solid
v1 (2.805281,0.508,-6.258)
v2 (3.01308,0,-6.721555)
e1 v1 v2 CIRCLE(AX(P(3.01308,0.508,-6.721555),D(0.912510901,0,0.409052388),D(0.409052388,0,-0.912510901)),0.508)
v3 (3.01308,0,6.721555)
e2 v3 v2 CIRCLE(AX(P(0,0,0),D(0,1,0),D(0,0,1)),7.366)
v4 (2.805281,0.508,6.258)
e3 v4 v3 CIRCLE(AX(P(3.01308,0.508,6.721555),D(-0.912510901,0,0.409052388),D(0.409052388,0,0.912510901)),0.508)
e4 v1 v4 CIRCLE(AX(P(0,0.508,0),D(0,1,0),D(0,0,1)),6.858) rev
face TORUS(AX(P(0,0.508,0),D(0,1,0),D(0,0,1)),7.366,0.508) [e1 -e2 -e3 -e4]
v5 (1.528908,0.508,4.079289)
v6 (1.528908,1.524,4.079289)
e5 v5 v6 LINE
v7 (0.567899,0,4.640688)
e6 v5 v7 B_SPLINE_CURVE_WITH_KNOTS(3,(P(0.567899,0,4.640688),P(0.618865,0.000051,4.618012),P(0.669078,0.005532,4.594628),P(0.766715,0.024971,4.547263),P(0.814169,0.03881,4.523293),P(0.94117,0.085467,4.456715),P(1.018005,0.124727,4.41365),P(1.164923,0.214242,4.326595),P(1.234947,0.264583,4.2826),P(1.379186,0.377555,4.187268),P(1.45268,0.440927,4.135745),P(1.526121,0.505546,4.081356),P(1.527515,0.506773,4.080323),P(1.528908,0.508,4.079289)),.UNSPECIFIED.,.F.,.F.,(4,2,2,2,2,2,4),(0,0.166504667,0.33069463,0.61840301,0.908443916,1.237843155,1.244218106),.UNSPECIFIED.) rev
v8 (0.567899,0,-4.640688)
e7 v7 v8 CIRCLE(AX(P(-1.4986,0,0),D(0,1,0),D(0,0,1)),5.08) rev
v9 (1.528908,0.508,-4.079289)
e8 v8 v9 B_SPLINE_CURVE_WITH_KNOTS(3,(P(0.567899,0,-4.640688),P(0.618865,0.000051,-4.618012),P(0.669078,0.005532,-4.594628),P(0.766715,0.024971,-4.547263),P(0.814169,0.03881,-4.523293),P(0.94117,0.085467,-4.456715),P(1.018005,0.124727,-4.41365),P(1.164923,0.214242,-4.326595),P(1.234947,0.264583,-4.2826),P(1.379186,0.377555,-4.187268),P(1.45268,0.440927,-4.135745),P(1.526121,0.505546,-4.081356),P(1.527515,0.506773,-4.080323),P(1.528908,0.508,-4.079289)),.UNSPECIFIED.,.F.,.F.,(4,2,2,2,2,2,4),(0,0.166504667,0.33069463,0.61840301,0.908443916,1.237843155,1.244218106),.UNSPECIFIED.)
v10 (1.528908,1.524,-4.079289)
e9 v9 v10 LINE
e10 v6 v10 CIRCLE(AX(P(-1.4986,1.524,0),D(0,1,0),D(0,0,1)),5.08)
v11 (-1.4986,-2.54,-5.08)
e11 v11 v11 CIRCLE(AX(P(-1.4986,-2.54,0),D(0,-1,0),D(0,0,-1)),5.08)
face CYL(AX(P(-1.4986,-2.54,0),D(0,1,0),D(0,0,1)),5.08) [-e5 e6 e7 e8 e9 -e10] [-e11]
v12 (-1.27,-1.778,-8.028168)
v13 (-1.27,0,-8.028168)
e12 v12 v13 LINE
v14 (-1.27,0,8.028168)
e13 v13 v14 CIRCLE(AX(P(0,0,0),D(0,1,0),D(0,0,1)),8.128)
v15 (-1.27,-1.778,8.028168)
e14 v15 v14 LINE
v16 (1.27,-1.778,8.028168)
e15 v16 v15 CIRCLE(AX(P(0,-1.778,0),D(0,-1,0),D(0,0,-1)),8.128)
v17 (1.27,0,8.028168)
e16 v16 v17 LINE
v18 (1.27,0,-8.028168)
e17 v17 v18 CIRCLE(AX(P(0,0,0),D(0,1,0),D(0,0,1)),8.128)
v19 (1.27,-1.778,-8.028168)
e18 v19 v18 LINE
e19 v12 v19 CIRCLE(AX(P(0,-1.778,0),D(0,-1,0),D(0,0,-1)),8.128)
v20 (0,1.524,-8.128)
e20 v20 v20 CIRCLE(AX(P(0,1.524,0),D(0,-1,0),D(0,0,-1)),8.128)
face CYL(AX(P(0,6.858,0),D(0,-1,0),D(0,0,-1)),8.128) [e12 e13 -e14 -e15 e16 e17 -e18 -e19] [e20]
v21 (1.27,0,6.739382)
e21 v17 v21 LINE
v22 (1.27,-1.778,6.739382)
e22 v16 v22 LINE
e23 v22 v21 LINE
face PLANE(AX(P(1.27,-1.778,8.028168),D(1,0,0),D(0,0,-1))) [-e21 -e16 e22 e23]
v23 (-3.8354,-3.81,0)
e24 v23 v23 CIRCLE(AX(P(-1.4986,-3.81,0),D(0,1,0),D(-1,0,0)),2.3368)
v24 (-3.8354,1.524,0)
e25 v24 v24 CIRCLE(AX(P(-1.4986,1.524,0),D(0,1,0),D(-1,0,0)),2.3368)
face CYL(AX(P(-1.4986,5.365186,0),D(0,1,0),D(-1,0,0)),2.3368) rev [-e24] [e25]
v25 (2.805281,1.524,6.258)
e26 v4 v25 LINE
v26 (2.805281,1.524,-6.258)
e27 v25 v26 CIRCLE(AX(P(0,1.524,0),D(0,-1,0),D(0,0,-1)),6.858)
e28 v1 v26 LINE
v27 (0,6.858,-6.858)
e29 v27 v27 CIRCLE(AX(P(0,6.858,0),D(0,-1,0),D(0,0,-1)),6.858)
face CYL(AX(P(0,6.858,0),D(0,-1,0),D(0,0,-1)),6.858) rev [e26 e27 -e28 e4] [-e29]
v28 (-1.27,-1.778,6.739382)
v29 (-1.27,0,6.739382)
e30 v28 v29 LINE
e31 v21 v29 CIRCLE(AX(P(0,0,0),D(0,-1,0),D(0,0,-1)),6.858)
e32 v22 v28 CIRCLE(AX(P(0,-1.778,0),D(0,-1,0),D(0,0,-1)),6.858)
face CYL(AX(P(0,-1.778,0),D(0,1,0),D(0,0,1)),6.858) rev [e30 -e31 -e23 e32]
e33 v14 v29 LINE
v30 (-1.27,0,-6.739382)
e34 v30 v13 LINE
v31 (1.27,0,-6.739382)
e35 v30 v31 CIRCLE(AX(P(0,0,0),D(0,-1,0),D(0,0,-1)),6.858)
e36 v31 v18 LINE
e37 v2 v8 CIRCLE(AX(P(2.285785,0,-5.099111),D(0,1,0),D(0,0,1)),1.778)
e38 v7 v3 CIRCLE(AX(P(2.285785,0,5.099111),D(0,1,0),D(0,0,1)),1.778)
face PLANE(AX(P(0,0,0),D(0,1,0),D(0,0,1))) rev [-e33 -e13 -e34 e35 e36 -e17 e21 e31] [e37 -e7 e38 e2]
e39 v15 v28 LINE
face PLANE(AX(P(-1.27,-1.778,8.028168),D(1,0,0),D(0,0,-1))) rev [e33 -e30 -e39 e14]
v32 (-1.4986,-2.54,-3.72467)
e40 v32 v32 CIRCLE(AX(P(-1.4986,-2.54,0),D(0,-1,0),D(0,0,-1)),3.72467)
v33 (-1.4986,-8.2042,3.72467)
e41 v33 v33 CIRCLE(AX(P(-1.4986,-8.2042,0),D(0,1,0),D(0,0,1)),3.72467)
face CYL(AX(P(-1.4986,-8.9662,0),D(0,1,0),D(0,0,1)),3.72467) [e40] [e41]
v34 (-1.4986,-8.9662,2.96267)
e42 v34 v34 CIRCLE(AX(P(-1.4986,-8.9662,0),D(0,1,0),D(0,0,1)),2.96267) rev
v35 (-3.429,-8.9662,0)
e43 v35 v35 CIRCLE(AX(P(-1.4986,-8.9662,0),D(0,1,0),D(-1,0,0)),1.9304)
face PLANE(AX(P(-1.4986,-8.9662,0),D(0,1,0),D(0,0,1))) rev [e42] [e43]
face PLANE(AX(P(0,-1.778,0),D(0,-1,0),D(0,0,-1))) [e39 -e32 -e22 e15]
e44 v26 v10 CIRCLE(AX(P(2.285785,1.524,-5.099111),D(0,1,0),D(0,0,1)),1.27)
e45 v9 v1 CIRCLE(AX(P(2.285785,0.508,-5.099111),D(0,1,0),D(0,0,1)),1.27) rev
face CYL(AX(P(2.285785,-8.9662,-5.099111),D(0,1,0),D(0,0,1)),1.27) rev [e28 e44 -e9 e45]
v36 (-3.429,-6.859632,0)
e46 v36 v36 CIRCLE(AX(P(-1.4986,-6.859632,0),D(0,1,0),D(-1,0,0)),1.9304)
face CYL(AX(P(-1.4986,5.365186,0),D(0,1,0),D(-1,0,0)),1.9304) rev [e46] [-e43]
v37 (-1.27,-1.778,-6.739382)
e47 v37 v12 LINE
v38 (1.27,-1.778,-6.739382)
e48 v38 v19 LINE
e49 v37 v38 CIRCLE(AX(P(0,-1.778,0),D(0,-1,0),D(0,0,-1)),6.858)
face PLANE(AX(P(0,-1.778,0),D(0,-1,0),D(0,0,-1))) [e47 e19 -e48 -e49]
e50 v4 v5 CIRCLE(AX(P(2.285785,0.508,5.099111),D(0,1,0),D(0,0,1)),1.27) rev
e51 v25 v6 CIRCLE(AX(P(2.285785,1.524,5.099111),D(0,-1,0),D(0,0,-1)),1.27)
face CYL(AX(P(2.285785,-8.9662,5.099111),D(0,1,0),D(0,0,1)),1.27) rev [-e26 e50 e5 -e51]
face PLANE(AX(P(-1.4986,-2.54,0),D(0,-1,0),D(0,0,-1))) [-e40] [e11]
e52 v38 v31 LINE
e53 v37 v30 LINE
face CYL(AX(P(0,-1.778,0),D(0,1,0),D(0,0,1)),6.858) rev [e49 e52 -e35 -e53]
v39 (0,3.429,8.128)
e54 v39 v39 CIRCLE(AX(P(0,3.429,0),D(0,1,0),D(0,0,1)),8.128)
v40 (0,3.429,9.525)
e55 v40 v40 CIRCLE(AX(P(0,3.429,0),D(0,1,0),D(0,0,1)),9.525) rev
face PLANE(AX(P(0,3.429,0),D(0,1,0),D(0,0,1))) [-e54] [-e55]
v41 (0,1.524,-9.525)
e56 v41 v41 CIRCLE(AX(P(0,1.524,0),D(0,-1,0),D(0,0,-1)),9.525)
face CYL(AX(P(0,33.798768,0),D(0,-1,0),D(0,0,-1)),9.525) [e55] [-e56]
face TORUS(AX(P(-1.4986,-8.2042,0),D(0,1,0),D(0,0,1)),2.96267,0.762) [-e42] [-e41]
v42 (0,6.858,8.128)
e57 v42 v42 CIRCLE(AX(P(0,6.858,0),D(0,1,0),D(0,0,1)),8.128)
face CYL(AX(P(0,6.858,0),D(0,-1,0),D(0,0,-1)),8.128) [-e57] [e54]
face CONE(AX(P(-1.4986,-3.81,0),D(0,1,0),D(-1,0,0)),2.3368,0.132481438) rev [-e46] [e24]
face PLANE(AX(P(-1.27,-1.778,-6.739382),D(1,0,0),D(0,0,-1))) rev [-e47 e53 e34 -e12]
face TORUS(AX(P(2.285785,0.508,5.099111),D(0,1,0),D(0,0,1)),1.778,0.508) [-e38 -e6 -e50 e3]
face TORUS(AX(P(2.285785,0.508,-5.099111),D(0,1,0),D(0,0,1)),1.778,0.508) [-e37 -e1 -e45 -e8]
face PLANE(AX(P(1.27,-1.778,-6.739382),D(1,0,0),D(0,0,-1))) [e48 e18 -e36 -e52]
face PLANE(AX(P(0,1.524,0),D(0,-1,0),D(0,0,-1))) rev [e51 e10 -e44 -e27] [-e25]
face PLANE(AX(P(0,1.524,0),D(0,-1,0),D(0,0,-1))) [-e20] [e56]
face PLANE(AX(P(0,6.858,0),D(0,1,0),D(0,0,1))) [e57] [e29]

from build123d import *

# Parameters (mm, degrees)
SKETCH1_R              = 8.128
TOP_BODY_DEPTH         = 6.858
SKETCH2_R              = 5.08
ECCENTRIC_SLEEVE_DEPTH = 2.54
SKETCH3_R              = 3.724670389
ECCENTRIC_SHAFT_DEPTH  = 15.8242
SKETCH4_R              = 9.525
FLANGE_DEPTH           = 1.905
SKETCH5_R              = 6.858
TOP_HOLE_DEPTH         = 18.073240643
GROOVE_DEPTH           = 18.073240643
PINS_DEPTH             = 1.778
FILLET1_R              = 0.508
FILLET2_R              = 0.762


with BuildPart() as part:
    # Sketch1 → Top Body (new body)
    with BuildSketch(Plane(origin=(0, 0, 0), x_dir=(1, 0, 0), z_dir=(0, 1, 0))):
        with Locations(Location((0, 0, 0), (0, 0, 270))):
            Circle(SKETCH1_R)
    extrude(amount=TOP_BODY_DEPTH)

    # Sketch2 → Eccentric Sleeve (add)
    with BuildSketch(Plane.XZ):
        with Locations(Location((-1.4986, 0, 0), (0, 0, 90))):
            Circle(SKETCH2_R)
    extrude(amount=ECCENTRIC_SLEEVE_DEPTH)

    # Sketch3 → Eccentric Shaft (add)
    with BuildSketch(Plane(origin=(0, 6.858, 0), x_dir=(-1, 0, 0), z_dir=(0, 1, 0))):
        with Locations(Location((1.4986, 0, 0), (0, 0, 90))):
            Circle(SKETCH3_R)
    extrude(amount=-ECCENTRIC_SHAFT_DEPTH)

    # Sketch4 → Flange (add)
    with BuildSketch(Plane.XZ.offset(-1.524)):
        with Locations(Location((0, 0, 0), (0, 0, 270))):
            Circle(SKETCH4_R)
    extrude(amount=-FLANGE_DEPTH)

    # Sketch5 → Top Hole (cut, through all)
    with BuildSketch(Plane.XZ.offset(-1.524)):
        with Locations(Location((0, 0, 0), (0, 0, 270))):
            Circle(SKETCH5_R)
    extrude(amount=-TOP_HOLE_DEPTH, mode=Mode.SUBTRACT)

    # Sketch6 → Tapped Hole (revolve, cut)
    with BuildSketch(Plane.XY, mode=Mode.PRIVATE) as tapped_hole_sk:
        Polygon((0.8382, 1.524), (-1.4986, 1.524), (-1.4986, -8.9662), (0.4318, -8.9662), (0.4318, -6.859631692), (0.8382, -3.81), align=None)
    revolve(tapped_hole_sk.sketch.rotate(Axis((-1.4986, 5.365186462, 0), (0, -1, 0)), 180), axis=Axis((-1.4986, 5.365186462, 0), (0, -1, 0)), mode=Mode.SUBTRACT)

    # Sketch7 → Groove (cut, through all)
    with BuildSketch(Plane(origin=(0, 1.524, 0), x_dir=(-1, 0, 0), z_dir=(0, 1, 0))):
        with BuildLine():
            ThreePointArc((-2.805281279, 6.257999756), (-6.858, 0), (-2.805281279, -6.257999756))
            ThreePointArc((-2.805281279, -6.257999756), (-1.189982392, -5.741074463), (-1.528907797, -4.07928873))
            ThreePointArc((-1.528907797, -4.07928873), (-3.5814, 0), (-1.528907797, 4.07928873))
            ThreePointArc((-1.528907797, 4.07928873), (-1.189982392, 5.741074463), (-2.805281279, 6.257999756))
        make_face()
    extrude(amount=-GROOVE_DEPTH, mode=Mode.SUBTRACT)

    # Sketch8 → Pins (add)
    with BuildSketch(Plane.XZ):
        with BuildLine():
            Line((-1.27, 8.02816816), (-1.27, 6.739381574))
            ThreePointArc((-1.27, 6.739381574), (0, 6.858), (1.27, 6.739381574))
            Line((1.27, 6.739381574), (1.27, 8.02816816))
            ThreePointArc((1.27, 8.02816816), (0, 8.128), (-1.27, 8.02816816))
        make_face()
        with BuildLine():
            Line((1.27, -6.739381574), (1.27, -8.02816816))
            ThreePointArc((1.27, -8.02816816), (0, -8.128), (-1.27, -8.02816816))
            Line((-1.27, -8.02816816), (-1.27, -6.739381574))
            ThreePointArc((-1.27, -6.739381574), (0, -6.858), (1.27, -6.739381574))
        make_face()
    extrude(amount=PINS_DEPTH)

    # Fillet1
    # the kernel refuses this fillet: 0.508 mm, written as the material it takes off along each edge
    with BuildSketch(Plane(origin=(2.285784746, 0, -5.099110912), x_dir=(0.40905238828967766, 0, -0.9125109005565417), z_dir=(0.9125109005565417, 0, 0.40905238828967766))) as fillet1_piece_1_section:
        with BuildLine():
            CenterArc((1.27 + FILLET1_R, FILLET1_R), FILLET1_R, 180, 90)
            Line((1.27, FILLET1_R), (1.27, 0))
            Line((1.27, 0), (1.27 + FILLET1_R, 0))
        make_face()
    fillet1_piece_1 = revolve(axis=Axis((2.285784746, 0, -5.099110912), (0, 1, 0)), revolution_arc=224.939404777, mode=Mode.PRIVATE)
    fillet1_piece_1 = fillet1_piece_1 - Plane(origin=(-1.4986, 0.082765889, 0), x_dir=(0, 0, 1), z_dir=(0, 1, 0)) * Cylinder(5.08, 8, mode=Mode.PRIVATE)
    add(fillet1_piece_1, mode=Mode.SUBTRACT)
    with BuildSketch(Plane(origin=(0, 0, 0), x_dir=(0.40905238828967727, 0, 0.9125109005565418), z_dir=(-0.9125109005565418, 0, 0.40905238828967727))) as fillet1_piece_2:
        with BuildLine():
            CenterArc((6.858 + FILLET1_R, FILLET1_R), FILLET1_R, 180, 90)
            Line((6.858, FILLET1_R), (6.858, 0))
            Line((6.858, 0), (6.858 + FILLET1_R, 0))
        make_face()
    revolve(axis=Axis((0, 0, 0), (0, 1, 0)), revolution_arc=131.709357588, mode=Mode.SUBTRACT)
    with BuildSketch(Plane(origin=(2.285784746, 0, 5.099110912), x_dir=(0.355010429323337, 0, -0.9348623401718886), z_dir=(0.9348623401718886, 0, 0.355010429323337))) as fillet1_piece_3_section:
        with BuildLine():
            CenterArc((1.27 + FILLET1_R, FILLET1_R), FILLET1_R, 180, 90)
            Line((1.27, FILLET1_R), (1.27, 0))
            Line((1.27, 0), (1.27 + FILLET1_R, 0))
        make_face()
    fillet1_piece_3 = revolve(axis=Axis((2.285784746, 0, 5.099110912), (0, 1, 0)), revolution_arc=224.939404777, mode=Mode.PRIVATE)
    fillet1_piece_3 = fillet1_piece_3 - Plane(origin=(-1.4986, 0.254, 0), x_dir=(0, 0, 1), z_dir=(0, 1, 0)) * Cylinder(5.08, 8, mode=Mode.PRIVATE)
    add(fillet1_piece_3, mode=Mode.SUBTRACT)

    # Fillet2
    fillet2_edges = [part.edges().sort_by_distance(p)[0] for p in [
        (-1.4986, -8.9662, -3.724670389),
    ]]
    fillet(fillet2_edges, radius=FILLET2_R)


solid = part.part
